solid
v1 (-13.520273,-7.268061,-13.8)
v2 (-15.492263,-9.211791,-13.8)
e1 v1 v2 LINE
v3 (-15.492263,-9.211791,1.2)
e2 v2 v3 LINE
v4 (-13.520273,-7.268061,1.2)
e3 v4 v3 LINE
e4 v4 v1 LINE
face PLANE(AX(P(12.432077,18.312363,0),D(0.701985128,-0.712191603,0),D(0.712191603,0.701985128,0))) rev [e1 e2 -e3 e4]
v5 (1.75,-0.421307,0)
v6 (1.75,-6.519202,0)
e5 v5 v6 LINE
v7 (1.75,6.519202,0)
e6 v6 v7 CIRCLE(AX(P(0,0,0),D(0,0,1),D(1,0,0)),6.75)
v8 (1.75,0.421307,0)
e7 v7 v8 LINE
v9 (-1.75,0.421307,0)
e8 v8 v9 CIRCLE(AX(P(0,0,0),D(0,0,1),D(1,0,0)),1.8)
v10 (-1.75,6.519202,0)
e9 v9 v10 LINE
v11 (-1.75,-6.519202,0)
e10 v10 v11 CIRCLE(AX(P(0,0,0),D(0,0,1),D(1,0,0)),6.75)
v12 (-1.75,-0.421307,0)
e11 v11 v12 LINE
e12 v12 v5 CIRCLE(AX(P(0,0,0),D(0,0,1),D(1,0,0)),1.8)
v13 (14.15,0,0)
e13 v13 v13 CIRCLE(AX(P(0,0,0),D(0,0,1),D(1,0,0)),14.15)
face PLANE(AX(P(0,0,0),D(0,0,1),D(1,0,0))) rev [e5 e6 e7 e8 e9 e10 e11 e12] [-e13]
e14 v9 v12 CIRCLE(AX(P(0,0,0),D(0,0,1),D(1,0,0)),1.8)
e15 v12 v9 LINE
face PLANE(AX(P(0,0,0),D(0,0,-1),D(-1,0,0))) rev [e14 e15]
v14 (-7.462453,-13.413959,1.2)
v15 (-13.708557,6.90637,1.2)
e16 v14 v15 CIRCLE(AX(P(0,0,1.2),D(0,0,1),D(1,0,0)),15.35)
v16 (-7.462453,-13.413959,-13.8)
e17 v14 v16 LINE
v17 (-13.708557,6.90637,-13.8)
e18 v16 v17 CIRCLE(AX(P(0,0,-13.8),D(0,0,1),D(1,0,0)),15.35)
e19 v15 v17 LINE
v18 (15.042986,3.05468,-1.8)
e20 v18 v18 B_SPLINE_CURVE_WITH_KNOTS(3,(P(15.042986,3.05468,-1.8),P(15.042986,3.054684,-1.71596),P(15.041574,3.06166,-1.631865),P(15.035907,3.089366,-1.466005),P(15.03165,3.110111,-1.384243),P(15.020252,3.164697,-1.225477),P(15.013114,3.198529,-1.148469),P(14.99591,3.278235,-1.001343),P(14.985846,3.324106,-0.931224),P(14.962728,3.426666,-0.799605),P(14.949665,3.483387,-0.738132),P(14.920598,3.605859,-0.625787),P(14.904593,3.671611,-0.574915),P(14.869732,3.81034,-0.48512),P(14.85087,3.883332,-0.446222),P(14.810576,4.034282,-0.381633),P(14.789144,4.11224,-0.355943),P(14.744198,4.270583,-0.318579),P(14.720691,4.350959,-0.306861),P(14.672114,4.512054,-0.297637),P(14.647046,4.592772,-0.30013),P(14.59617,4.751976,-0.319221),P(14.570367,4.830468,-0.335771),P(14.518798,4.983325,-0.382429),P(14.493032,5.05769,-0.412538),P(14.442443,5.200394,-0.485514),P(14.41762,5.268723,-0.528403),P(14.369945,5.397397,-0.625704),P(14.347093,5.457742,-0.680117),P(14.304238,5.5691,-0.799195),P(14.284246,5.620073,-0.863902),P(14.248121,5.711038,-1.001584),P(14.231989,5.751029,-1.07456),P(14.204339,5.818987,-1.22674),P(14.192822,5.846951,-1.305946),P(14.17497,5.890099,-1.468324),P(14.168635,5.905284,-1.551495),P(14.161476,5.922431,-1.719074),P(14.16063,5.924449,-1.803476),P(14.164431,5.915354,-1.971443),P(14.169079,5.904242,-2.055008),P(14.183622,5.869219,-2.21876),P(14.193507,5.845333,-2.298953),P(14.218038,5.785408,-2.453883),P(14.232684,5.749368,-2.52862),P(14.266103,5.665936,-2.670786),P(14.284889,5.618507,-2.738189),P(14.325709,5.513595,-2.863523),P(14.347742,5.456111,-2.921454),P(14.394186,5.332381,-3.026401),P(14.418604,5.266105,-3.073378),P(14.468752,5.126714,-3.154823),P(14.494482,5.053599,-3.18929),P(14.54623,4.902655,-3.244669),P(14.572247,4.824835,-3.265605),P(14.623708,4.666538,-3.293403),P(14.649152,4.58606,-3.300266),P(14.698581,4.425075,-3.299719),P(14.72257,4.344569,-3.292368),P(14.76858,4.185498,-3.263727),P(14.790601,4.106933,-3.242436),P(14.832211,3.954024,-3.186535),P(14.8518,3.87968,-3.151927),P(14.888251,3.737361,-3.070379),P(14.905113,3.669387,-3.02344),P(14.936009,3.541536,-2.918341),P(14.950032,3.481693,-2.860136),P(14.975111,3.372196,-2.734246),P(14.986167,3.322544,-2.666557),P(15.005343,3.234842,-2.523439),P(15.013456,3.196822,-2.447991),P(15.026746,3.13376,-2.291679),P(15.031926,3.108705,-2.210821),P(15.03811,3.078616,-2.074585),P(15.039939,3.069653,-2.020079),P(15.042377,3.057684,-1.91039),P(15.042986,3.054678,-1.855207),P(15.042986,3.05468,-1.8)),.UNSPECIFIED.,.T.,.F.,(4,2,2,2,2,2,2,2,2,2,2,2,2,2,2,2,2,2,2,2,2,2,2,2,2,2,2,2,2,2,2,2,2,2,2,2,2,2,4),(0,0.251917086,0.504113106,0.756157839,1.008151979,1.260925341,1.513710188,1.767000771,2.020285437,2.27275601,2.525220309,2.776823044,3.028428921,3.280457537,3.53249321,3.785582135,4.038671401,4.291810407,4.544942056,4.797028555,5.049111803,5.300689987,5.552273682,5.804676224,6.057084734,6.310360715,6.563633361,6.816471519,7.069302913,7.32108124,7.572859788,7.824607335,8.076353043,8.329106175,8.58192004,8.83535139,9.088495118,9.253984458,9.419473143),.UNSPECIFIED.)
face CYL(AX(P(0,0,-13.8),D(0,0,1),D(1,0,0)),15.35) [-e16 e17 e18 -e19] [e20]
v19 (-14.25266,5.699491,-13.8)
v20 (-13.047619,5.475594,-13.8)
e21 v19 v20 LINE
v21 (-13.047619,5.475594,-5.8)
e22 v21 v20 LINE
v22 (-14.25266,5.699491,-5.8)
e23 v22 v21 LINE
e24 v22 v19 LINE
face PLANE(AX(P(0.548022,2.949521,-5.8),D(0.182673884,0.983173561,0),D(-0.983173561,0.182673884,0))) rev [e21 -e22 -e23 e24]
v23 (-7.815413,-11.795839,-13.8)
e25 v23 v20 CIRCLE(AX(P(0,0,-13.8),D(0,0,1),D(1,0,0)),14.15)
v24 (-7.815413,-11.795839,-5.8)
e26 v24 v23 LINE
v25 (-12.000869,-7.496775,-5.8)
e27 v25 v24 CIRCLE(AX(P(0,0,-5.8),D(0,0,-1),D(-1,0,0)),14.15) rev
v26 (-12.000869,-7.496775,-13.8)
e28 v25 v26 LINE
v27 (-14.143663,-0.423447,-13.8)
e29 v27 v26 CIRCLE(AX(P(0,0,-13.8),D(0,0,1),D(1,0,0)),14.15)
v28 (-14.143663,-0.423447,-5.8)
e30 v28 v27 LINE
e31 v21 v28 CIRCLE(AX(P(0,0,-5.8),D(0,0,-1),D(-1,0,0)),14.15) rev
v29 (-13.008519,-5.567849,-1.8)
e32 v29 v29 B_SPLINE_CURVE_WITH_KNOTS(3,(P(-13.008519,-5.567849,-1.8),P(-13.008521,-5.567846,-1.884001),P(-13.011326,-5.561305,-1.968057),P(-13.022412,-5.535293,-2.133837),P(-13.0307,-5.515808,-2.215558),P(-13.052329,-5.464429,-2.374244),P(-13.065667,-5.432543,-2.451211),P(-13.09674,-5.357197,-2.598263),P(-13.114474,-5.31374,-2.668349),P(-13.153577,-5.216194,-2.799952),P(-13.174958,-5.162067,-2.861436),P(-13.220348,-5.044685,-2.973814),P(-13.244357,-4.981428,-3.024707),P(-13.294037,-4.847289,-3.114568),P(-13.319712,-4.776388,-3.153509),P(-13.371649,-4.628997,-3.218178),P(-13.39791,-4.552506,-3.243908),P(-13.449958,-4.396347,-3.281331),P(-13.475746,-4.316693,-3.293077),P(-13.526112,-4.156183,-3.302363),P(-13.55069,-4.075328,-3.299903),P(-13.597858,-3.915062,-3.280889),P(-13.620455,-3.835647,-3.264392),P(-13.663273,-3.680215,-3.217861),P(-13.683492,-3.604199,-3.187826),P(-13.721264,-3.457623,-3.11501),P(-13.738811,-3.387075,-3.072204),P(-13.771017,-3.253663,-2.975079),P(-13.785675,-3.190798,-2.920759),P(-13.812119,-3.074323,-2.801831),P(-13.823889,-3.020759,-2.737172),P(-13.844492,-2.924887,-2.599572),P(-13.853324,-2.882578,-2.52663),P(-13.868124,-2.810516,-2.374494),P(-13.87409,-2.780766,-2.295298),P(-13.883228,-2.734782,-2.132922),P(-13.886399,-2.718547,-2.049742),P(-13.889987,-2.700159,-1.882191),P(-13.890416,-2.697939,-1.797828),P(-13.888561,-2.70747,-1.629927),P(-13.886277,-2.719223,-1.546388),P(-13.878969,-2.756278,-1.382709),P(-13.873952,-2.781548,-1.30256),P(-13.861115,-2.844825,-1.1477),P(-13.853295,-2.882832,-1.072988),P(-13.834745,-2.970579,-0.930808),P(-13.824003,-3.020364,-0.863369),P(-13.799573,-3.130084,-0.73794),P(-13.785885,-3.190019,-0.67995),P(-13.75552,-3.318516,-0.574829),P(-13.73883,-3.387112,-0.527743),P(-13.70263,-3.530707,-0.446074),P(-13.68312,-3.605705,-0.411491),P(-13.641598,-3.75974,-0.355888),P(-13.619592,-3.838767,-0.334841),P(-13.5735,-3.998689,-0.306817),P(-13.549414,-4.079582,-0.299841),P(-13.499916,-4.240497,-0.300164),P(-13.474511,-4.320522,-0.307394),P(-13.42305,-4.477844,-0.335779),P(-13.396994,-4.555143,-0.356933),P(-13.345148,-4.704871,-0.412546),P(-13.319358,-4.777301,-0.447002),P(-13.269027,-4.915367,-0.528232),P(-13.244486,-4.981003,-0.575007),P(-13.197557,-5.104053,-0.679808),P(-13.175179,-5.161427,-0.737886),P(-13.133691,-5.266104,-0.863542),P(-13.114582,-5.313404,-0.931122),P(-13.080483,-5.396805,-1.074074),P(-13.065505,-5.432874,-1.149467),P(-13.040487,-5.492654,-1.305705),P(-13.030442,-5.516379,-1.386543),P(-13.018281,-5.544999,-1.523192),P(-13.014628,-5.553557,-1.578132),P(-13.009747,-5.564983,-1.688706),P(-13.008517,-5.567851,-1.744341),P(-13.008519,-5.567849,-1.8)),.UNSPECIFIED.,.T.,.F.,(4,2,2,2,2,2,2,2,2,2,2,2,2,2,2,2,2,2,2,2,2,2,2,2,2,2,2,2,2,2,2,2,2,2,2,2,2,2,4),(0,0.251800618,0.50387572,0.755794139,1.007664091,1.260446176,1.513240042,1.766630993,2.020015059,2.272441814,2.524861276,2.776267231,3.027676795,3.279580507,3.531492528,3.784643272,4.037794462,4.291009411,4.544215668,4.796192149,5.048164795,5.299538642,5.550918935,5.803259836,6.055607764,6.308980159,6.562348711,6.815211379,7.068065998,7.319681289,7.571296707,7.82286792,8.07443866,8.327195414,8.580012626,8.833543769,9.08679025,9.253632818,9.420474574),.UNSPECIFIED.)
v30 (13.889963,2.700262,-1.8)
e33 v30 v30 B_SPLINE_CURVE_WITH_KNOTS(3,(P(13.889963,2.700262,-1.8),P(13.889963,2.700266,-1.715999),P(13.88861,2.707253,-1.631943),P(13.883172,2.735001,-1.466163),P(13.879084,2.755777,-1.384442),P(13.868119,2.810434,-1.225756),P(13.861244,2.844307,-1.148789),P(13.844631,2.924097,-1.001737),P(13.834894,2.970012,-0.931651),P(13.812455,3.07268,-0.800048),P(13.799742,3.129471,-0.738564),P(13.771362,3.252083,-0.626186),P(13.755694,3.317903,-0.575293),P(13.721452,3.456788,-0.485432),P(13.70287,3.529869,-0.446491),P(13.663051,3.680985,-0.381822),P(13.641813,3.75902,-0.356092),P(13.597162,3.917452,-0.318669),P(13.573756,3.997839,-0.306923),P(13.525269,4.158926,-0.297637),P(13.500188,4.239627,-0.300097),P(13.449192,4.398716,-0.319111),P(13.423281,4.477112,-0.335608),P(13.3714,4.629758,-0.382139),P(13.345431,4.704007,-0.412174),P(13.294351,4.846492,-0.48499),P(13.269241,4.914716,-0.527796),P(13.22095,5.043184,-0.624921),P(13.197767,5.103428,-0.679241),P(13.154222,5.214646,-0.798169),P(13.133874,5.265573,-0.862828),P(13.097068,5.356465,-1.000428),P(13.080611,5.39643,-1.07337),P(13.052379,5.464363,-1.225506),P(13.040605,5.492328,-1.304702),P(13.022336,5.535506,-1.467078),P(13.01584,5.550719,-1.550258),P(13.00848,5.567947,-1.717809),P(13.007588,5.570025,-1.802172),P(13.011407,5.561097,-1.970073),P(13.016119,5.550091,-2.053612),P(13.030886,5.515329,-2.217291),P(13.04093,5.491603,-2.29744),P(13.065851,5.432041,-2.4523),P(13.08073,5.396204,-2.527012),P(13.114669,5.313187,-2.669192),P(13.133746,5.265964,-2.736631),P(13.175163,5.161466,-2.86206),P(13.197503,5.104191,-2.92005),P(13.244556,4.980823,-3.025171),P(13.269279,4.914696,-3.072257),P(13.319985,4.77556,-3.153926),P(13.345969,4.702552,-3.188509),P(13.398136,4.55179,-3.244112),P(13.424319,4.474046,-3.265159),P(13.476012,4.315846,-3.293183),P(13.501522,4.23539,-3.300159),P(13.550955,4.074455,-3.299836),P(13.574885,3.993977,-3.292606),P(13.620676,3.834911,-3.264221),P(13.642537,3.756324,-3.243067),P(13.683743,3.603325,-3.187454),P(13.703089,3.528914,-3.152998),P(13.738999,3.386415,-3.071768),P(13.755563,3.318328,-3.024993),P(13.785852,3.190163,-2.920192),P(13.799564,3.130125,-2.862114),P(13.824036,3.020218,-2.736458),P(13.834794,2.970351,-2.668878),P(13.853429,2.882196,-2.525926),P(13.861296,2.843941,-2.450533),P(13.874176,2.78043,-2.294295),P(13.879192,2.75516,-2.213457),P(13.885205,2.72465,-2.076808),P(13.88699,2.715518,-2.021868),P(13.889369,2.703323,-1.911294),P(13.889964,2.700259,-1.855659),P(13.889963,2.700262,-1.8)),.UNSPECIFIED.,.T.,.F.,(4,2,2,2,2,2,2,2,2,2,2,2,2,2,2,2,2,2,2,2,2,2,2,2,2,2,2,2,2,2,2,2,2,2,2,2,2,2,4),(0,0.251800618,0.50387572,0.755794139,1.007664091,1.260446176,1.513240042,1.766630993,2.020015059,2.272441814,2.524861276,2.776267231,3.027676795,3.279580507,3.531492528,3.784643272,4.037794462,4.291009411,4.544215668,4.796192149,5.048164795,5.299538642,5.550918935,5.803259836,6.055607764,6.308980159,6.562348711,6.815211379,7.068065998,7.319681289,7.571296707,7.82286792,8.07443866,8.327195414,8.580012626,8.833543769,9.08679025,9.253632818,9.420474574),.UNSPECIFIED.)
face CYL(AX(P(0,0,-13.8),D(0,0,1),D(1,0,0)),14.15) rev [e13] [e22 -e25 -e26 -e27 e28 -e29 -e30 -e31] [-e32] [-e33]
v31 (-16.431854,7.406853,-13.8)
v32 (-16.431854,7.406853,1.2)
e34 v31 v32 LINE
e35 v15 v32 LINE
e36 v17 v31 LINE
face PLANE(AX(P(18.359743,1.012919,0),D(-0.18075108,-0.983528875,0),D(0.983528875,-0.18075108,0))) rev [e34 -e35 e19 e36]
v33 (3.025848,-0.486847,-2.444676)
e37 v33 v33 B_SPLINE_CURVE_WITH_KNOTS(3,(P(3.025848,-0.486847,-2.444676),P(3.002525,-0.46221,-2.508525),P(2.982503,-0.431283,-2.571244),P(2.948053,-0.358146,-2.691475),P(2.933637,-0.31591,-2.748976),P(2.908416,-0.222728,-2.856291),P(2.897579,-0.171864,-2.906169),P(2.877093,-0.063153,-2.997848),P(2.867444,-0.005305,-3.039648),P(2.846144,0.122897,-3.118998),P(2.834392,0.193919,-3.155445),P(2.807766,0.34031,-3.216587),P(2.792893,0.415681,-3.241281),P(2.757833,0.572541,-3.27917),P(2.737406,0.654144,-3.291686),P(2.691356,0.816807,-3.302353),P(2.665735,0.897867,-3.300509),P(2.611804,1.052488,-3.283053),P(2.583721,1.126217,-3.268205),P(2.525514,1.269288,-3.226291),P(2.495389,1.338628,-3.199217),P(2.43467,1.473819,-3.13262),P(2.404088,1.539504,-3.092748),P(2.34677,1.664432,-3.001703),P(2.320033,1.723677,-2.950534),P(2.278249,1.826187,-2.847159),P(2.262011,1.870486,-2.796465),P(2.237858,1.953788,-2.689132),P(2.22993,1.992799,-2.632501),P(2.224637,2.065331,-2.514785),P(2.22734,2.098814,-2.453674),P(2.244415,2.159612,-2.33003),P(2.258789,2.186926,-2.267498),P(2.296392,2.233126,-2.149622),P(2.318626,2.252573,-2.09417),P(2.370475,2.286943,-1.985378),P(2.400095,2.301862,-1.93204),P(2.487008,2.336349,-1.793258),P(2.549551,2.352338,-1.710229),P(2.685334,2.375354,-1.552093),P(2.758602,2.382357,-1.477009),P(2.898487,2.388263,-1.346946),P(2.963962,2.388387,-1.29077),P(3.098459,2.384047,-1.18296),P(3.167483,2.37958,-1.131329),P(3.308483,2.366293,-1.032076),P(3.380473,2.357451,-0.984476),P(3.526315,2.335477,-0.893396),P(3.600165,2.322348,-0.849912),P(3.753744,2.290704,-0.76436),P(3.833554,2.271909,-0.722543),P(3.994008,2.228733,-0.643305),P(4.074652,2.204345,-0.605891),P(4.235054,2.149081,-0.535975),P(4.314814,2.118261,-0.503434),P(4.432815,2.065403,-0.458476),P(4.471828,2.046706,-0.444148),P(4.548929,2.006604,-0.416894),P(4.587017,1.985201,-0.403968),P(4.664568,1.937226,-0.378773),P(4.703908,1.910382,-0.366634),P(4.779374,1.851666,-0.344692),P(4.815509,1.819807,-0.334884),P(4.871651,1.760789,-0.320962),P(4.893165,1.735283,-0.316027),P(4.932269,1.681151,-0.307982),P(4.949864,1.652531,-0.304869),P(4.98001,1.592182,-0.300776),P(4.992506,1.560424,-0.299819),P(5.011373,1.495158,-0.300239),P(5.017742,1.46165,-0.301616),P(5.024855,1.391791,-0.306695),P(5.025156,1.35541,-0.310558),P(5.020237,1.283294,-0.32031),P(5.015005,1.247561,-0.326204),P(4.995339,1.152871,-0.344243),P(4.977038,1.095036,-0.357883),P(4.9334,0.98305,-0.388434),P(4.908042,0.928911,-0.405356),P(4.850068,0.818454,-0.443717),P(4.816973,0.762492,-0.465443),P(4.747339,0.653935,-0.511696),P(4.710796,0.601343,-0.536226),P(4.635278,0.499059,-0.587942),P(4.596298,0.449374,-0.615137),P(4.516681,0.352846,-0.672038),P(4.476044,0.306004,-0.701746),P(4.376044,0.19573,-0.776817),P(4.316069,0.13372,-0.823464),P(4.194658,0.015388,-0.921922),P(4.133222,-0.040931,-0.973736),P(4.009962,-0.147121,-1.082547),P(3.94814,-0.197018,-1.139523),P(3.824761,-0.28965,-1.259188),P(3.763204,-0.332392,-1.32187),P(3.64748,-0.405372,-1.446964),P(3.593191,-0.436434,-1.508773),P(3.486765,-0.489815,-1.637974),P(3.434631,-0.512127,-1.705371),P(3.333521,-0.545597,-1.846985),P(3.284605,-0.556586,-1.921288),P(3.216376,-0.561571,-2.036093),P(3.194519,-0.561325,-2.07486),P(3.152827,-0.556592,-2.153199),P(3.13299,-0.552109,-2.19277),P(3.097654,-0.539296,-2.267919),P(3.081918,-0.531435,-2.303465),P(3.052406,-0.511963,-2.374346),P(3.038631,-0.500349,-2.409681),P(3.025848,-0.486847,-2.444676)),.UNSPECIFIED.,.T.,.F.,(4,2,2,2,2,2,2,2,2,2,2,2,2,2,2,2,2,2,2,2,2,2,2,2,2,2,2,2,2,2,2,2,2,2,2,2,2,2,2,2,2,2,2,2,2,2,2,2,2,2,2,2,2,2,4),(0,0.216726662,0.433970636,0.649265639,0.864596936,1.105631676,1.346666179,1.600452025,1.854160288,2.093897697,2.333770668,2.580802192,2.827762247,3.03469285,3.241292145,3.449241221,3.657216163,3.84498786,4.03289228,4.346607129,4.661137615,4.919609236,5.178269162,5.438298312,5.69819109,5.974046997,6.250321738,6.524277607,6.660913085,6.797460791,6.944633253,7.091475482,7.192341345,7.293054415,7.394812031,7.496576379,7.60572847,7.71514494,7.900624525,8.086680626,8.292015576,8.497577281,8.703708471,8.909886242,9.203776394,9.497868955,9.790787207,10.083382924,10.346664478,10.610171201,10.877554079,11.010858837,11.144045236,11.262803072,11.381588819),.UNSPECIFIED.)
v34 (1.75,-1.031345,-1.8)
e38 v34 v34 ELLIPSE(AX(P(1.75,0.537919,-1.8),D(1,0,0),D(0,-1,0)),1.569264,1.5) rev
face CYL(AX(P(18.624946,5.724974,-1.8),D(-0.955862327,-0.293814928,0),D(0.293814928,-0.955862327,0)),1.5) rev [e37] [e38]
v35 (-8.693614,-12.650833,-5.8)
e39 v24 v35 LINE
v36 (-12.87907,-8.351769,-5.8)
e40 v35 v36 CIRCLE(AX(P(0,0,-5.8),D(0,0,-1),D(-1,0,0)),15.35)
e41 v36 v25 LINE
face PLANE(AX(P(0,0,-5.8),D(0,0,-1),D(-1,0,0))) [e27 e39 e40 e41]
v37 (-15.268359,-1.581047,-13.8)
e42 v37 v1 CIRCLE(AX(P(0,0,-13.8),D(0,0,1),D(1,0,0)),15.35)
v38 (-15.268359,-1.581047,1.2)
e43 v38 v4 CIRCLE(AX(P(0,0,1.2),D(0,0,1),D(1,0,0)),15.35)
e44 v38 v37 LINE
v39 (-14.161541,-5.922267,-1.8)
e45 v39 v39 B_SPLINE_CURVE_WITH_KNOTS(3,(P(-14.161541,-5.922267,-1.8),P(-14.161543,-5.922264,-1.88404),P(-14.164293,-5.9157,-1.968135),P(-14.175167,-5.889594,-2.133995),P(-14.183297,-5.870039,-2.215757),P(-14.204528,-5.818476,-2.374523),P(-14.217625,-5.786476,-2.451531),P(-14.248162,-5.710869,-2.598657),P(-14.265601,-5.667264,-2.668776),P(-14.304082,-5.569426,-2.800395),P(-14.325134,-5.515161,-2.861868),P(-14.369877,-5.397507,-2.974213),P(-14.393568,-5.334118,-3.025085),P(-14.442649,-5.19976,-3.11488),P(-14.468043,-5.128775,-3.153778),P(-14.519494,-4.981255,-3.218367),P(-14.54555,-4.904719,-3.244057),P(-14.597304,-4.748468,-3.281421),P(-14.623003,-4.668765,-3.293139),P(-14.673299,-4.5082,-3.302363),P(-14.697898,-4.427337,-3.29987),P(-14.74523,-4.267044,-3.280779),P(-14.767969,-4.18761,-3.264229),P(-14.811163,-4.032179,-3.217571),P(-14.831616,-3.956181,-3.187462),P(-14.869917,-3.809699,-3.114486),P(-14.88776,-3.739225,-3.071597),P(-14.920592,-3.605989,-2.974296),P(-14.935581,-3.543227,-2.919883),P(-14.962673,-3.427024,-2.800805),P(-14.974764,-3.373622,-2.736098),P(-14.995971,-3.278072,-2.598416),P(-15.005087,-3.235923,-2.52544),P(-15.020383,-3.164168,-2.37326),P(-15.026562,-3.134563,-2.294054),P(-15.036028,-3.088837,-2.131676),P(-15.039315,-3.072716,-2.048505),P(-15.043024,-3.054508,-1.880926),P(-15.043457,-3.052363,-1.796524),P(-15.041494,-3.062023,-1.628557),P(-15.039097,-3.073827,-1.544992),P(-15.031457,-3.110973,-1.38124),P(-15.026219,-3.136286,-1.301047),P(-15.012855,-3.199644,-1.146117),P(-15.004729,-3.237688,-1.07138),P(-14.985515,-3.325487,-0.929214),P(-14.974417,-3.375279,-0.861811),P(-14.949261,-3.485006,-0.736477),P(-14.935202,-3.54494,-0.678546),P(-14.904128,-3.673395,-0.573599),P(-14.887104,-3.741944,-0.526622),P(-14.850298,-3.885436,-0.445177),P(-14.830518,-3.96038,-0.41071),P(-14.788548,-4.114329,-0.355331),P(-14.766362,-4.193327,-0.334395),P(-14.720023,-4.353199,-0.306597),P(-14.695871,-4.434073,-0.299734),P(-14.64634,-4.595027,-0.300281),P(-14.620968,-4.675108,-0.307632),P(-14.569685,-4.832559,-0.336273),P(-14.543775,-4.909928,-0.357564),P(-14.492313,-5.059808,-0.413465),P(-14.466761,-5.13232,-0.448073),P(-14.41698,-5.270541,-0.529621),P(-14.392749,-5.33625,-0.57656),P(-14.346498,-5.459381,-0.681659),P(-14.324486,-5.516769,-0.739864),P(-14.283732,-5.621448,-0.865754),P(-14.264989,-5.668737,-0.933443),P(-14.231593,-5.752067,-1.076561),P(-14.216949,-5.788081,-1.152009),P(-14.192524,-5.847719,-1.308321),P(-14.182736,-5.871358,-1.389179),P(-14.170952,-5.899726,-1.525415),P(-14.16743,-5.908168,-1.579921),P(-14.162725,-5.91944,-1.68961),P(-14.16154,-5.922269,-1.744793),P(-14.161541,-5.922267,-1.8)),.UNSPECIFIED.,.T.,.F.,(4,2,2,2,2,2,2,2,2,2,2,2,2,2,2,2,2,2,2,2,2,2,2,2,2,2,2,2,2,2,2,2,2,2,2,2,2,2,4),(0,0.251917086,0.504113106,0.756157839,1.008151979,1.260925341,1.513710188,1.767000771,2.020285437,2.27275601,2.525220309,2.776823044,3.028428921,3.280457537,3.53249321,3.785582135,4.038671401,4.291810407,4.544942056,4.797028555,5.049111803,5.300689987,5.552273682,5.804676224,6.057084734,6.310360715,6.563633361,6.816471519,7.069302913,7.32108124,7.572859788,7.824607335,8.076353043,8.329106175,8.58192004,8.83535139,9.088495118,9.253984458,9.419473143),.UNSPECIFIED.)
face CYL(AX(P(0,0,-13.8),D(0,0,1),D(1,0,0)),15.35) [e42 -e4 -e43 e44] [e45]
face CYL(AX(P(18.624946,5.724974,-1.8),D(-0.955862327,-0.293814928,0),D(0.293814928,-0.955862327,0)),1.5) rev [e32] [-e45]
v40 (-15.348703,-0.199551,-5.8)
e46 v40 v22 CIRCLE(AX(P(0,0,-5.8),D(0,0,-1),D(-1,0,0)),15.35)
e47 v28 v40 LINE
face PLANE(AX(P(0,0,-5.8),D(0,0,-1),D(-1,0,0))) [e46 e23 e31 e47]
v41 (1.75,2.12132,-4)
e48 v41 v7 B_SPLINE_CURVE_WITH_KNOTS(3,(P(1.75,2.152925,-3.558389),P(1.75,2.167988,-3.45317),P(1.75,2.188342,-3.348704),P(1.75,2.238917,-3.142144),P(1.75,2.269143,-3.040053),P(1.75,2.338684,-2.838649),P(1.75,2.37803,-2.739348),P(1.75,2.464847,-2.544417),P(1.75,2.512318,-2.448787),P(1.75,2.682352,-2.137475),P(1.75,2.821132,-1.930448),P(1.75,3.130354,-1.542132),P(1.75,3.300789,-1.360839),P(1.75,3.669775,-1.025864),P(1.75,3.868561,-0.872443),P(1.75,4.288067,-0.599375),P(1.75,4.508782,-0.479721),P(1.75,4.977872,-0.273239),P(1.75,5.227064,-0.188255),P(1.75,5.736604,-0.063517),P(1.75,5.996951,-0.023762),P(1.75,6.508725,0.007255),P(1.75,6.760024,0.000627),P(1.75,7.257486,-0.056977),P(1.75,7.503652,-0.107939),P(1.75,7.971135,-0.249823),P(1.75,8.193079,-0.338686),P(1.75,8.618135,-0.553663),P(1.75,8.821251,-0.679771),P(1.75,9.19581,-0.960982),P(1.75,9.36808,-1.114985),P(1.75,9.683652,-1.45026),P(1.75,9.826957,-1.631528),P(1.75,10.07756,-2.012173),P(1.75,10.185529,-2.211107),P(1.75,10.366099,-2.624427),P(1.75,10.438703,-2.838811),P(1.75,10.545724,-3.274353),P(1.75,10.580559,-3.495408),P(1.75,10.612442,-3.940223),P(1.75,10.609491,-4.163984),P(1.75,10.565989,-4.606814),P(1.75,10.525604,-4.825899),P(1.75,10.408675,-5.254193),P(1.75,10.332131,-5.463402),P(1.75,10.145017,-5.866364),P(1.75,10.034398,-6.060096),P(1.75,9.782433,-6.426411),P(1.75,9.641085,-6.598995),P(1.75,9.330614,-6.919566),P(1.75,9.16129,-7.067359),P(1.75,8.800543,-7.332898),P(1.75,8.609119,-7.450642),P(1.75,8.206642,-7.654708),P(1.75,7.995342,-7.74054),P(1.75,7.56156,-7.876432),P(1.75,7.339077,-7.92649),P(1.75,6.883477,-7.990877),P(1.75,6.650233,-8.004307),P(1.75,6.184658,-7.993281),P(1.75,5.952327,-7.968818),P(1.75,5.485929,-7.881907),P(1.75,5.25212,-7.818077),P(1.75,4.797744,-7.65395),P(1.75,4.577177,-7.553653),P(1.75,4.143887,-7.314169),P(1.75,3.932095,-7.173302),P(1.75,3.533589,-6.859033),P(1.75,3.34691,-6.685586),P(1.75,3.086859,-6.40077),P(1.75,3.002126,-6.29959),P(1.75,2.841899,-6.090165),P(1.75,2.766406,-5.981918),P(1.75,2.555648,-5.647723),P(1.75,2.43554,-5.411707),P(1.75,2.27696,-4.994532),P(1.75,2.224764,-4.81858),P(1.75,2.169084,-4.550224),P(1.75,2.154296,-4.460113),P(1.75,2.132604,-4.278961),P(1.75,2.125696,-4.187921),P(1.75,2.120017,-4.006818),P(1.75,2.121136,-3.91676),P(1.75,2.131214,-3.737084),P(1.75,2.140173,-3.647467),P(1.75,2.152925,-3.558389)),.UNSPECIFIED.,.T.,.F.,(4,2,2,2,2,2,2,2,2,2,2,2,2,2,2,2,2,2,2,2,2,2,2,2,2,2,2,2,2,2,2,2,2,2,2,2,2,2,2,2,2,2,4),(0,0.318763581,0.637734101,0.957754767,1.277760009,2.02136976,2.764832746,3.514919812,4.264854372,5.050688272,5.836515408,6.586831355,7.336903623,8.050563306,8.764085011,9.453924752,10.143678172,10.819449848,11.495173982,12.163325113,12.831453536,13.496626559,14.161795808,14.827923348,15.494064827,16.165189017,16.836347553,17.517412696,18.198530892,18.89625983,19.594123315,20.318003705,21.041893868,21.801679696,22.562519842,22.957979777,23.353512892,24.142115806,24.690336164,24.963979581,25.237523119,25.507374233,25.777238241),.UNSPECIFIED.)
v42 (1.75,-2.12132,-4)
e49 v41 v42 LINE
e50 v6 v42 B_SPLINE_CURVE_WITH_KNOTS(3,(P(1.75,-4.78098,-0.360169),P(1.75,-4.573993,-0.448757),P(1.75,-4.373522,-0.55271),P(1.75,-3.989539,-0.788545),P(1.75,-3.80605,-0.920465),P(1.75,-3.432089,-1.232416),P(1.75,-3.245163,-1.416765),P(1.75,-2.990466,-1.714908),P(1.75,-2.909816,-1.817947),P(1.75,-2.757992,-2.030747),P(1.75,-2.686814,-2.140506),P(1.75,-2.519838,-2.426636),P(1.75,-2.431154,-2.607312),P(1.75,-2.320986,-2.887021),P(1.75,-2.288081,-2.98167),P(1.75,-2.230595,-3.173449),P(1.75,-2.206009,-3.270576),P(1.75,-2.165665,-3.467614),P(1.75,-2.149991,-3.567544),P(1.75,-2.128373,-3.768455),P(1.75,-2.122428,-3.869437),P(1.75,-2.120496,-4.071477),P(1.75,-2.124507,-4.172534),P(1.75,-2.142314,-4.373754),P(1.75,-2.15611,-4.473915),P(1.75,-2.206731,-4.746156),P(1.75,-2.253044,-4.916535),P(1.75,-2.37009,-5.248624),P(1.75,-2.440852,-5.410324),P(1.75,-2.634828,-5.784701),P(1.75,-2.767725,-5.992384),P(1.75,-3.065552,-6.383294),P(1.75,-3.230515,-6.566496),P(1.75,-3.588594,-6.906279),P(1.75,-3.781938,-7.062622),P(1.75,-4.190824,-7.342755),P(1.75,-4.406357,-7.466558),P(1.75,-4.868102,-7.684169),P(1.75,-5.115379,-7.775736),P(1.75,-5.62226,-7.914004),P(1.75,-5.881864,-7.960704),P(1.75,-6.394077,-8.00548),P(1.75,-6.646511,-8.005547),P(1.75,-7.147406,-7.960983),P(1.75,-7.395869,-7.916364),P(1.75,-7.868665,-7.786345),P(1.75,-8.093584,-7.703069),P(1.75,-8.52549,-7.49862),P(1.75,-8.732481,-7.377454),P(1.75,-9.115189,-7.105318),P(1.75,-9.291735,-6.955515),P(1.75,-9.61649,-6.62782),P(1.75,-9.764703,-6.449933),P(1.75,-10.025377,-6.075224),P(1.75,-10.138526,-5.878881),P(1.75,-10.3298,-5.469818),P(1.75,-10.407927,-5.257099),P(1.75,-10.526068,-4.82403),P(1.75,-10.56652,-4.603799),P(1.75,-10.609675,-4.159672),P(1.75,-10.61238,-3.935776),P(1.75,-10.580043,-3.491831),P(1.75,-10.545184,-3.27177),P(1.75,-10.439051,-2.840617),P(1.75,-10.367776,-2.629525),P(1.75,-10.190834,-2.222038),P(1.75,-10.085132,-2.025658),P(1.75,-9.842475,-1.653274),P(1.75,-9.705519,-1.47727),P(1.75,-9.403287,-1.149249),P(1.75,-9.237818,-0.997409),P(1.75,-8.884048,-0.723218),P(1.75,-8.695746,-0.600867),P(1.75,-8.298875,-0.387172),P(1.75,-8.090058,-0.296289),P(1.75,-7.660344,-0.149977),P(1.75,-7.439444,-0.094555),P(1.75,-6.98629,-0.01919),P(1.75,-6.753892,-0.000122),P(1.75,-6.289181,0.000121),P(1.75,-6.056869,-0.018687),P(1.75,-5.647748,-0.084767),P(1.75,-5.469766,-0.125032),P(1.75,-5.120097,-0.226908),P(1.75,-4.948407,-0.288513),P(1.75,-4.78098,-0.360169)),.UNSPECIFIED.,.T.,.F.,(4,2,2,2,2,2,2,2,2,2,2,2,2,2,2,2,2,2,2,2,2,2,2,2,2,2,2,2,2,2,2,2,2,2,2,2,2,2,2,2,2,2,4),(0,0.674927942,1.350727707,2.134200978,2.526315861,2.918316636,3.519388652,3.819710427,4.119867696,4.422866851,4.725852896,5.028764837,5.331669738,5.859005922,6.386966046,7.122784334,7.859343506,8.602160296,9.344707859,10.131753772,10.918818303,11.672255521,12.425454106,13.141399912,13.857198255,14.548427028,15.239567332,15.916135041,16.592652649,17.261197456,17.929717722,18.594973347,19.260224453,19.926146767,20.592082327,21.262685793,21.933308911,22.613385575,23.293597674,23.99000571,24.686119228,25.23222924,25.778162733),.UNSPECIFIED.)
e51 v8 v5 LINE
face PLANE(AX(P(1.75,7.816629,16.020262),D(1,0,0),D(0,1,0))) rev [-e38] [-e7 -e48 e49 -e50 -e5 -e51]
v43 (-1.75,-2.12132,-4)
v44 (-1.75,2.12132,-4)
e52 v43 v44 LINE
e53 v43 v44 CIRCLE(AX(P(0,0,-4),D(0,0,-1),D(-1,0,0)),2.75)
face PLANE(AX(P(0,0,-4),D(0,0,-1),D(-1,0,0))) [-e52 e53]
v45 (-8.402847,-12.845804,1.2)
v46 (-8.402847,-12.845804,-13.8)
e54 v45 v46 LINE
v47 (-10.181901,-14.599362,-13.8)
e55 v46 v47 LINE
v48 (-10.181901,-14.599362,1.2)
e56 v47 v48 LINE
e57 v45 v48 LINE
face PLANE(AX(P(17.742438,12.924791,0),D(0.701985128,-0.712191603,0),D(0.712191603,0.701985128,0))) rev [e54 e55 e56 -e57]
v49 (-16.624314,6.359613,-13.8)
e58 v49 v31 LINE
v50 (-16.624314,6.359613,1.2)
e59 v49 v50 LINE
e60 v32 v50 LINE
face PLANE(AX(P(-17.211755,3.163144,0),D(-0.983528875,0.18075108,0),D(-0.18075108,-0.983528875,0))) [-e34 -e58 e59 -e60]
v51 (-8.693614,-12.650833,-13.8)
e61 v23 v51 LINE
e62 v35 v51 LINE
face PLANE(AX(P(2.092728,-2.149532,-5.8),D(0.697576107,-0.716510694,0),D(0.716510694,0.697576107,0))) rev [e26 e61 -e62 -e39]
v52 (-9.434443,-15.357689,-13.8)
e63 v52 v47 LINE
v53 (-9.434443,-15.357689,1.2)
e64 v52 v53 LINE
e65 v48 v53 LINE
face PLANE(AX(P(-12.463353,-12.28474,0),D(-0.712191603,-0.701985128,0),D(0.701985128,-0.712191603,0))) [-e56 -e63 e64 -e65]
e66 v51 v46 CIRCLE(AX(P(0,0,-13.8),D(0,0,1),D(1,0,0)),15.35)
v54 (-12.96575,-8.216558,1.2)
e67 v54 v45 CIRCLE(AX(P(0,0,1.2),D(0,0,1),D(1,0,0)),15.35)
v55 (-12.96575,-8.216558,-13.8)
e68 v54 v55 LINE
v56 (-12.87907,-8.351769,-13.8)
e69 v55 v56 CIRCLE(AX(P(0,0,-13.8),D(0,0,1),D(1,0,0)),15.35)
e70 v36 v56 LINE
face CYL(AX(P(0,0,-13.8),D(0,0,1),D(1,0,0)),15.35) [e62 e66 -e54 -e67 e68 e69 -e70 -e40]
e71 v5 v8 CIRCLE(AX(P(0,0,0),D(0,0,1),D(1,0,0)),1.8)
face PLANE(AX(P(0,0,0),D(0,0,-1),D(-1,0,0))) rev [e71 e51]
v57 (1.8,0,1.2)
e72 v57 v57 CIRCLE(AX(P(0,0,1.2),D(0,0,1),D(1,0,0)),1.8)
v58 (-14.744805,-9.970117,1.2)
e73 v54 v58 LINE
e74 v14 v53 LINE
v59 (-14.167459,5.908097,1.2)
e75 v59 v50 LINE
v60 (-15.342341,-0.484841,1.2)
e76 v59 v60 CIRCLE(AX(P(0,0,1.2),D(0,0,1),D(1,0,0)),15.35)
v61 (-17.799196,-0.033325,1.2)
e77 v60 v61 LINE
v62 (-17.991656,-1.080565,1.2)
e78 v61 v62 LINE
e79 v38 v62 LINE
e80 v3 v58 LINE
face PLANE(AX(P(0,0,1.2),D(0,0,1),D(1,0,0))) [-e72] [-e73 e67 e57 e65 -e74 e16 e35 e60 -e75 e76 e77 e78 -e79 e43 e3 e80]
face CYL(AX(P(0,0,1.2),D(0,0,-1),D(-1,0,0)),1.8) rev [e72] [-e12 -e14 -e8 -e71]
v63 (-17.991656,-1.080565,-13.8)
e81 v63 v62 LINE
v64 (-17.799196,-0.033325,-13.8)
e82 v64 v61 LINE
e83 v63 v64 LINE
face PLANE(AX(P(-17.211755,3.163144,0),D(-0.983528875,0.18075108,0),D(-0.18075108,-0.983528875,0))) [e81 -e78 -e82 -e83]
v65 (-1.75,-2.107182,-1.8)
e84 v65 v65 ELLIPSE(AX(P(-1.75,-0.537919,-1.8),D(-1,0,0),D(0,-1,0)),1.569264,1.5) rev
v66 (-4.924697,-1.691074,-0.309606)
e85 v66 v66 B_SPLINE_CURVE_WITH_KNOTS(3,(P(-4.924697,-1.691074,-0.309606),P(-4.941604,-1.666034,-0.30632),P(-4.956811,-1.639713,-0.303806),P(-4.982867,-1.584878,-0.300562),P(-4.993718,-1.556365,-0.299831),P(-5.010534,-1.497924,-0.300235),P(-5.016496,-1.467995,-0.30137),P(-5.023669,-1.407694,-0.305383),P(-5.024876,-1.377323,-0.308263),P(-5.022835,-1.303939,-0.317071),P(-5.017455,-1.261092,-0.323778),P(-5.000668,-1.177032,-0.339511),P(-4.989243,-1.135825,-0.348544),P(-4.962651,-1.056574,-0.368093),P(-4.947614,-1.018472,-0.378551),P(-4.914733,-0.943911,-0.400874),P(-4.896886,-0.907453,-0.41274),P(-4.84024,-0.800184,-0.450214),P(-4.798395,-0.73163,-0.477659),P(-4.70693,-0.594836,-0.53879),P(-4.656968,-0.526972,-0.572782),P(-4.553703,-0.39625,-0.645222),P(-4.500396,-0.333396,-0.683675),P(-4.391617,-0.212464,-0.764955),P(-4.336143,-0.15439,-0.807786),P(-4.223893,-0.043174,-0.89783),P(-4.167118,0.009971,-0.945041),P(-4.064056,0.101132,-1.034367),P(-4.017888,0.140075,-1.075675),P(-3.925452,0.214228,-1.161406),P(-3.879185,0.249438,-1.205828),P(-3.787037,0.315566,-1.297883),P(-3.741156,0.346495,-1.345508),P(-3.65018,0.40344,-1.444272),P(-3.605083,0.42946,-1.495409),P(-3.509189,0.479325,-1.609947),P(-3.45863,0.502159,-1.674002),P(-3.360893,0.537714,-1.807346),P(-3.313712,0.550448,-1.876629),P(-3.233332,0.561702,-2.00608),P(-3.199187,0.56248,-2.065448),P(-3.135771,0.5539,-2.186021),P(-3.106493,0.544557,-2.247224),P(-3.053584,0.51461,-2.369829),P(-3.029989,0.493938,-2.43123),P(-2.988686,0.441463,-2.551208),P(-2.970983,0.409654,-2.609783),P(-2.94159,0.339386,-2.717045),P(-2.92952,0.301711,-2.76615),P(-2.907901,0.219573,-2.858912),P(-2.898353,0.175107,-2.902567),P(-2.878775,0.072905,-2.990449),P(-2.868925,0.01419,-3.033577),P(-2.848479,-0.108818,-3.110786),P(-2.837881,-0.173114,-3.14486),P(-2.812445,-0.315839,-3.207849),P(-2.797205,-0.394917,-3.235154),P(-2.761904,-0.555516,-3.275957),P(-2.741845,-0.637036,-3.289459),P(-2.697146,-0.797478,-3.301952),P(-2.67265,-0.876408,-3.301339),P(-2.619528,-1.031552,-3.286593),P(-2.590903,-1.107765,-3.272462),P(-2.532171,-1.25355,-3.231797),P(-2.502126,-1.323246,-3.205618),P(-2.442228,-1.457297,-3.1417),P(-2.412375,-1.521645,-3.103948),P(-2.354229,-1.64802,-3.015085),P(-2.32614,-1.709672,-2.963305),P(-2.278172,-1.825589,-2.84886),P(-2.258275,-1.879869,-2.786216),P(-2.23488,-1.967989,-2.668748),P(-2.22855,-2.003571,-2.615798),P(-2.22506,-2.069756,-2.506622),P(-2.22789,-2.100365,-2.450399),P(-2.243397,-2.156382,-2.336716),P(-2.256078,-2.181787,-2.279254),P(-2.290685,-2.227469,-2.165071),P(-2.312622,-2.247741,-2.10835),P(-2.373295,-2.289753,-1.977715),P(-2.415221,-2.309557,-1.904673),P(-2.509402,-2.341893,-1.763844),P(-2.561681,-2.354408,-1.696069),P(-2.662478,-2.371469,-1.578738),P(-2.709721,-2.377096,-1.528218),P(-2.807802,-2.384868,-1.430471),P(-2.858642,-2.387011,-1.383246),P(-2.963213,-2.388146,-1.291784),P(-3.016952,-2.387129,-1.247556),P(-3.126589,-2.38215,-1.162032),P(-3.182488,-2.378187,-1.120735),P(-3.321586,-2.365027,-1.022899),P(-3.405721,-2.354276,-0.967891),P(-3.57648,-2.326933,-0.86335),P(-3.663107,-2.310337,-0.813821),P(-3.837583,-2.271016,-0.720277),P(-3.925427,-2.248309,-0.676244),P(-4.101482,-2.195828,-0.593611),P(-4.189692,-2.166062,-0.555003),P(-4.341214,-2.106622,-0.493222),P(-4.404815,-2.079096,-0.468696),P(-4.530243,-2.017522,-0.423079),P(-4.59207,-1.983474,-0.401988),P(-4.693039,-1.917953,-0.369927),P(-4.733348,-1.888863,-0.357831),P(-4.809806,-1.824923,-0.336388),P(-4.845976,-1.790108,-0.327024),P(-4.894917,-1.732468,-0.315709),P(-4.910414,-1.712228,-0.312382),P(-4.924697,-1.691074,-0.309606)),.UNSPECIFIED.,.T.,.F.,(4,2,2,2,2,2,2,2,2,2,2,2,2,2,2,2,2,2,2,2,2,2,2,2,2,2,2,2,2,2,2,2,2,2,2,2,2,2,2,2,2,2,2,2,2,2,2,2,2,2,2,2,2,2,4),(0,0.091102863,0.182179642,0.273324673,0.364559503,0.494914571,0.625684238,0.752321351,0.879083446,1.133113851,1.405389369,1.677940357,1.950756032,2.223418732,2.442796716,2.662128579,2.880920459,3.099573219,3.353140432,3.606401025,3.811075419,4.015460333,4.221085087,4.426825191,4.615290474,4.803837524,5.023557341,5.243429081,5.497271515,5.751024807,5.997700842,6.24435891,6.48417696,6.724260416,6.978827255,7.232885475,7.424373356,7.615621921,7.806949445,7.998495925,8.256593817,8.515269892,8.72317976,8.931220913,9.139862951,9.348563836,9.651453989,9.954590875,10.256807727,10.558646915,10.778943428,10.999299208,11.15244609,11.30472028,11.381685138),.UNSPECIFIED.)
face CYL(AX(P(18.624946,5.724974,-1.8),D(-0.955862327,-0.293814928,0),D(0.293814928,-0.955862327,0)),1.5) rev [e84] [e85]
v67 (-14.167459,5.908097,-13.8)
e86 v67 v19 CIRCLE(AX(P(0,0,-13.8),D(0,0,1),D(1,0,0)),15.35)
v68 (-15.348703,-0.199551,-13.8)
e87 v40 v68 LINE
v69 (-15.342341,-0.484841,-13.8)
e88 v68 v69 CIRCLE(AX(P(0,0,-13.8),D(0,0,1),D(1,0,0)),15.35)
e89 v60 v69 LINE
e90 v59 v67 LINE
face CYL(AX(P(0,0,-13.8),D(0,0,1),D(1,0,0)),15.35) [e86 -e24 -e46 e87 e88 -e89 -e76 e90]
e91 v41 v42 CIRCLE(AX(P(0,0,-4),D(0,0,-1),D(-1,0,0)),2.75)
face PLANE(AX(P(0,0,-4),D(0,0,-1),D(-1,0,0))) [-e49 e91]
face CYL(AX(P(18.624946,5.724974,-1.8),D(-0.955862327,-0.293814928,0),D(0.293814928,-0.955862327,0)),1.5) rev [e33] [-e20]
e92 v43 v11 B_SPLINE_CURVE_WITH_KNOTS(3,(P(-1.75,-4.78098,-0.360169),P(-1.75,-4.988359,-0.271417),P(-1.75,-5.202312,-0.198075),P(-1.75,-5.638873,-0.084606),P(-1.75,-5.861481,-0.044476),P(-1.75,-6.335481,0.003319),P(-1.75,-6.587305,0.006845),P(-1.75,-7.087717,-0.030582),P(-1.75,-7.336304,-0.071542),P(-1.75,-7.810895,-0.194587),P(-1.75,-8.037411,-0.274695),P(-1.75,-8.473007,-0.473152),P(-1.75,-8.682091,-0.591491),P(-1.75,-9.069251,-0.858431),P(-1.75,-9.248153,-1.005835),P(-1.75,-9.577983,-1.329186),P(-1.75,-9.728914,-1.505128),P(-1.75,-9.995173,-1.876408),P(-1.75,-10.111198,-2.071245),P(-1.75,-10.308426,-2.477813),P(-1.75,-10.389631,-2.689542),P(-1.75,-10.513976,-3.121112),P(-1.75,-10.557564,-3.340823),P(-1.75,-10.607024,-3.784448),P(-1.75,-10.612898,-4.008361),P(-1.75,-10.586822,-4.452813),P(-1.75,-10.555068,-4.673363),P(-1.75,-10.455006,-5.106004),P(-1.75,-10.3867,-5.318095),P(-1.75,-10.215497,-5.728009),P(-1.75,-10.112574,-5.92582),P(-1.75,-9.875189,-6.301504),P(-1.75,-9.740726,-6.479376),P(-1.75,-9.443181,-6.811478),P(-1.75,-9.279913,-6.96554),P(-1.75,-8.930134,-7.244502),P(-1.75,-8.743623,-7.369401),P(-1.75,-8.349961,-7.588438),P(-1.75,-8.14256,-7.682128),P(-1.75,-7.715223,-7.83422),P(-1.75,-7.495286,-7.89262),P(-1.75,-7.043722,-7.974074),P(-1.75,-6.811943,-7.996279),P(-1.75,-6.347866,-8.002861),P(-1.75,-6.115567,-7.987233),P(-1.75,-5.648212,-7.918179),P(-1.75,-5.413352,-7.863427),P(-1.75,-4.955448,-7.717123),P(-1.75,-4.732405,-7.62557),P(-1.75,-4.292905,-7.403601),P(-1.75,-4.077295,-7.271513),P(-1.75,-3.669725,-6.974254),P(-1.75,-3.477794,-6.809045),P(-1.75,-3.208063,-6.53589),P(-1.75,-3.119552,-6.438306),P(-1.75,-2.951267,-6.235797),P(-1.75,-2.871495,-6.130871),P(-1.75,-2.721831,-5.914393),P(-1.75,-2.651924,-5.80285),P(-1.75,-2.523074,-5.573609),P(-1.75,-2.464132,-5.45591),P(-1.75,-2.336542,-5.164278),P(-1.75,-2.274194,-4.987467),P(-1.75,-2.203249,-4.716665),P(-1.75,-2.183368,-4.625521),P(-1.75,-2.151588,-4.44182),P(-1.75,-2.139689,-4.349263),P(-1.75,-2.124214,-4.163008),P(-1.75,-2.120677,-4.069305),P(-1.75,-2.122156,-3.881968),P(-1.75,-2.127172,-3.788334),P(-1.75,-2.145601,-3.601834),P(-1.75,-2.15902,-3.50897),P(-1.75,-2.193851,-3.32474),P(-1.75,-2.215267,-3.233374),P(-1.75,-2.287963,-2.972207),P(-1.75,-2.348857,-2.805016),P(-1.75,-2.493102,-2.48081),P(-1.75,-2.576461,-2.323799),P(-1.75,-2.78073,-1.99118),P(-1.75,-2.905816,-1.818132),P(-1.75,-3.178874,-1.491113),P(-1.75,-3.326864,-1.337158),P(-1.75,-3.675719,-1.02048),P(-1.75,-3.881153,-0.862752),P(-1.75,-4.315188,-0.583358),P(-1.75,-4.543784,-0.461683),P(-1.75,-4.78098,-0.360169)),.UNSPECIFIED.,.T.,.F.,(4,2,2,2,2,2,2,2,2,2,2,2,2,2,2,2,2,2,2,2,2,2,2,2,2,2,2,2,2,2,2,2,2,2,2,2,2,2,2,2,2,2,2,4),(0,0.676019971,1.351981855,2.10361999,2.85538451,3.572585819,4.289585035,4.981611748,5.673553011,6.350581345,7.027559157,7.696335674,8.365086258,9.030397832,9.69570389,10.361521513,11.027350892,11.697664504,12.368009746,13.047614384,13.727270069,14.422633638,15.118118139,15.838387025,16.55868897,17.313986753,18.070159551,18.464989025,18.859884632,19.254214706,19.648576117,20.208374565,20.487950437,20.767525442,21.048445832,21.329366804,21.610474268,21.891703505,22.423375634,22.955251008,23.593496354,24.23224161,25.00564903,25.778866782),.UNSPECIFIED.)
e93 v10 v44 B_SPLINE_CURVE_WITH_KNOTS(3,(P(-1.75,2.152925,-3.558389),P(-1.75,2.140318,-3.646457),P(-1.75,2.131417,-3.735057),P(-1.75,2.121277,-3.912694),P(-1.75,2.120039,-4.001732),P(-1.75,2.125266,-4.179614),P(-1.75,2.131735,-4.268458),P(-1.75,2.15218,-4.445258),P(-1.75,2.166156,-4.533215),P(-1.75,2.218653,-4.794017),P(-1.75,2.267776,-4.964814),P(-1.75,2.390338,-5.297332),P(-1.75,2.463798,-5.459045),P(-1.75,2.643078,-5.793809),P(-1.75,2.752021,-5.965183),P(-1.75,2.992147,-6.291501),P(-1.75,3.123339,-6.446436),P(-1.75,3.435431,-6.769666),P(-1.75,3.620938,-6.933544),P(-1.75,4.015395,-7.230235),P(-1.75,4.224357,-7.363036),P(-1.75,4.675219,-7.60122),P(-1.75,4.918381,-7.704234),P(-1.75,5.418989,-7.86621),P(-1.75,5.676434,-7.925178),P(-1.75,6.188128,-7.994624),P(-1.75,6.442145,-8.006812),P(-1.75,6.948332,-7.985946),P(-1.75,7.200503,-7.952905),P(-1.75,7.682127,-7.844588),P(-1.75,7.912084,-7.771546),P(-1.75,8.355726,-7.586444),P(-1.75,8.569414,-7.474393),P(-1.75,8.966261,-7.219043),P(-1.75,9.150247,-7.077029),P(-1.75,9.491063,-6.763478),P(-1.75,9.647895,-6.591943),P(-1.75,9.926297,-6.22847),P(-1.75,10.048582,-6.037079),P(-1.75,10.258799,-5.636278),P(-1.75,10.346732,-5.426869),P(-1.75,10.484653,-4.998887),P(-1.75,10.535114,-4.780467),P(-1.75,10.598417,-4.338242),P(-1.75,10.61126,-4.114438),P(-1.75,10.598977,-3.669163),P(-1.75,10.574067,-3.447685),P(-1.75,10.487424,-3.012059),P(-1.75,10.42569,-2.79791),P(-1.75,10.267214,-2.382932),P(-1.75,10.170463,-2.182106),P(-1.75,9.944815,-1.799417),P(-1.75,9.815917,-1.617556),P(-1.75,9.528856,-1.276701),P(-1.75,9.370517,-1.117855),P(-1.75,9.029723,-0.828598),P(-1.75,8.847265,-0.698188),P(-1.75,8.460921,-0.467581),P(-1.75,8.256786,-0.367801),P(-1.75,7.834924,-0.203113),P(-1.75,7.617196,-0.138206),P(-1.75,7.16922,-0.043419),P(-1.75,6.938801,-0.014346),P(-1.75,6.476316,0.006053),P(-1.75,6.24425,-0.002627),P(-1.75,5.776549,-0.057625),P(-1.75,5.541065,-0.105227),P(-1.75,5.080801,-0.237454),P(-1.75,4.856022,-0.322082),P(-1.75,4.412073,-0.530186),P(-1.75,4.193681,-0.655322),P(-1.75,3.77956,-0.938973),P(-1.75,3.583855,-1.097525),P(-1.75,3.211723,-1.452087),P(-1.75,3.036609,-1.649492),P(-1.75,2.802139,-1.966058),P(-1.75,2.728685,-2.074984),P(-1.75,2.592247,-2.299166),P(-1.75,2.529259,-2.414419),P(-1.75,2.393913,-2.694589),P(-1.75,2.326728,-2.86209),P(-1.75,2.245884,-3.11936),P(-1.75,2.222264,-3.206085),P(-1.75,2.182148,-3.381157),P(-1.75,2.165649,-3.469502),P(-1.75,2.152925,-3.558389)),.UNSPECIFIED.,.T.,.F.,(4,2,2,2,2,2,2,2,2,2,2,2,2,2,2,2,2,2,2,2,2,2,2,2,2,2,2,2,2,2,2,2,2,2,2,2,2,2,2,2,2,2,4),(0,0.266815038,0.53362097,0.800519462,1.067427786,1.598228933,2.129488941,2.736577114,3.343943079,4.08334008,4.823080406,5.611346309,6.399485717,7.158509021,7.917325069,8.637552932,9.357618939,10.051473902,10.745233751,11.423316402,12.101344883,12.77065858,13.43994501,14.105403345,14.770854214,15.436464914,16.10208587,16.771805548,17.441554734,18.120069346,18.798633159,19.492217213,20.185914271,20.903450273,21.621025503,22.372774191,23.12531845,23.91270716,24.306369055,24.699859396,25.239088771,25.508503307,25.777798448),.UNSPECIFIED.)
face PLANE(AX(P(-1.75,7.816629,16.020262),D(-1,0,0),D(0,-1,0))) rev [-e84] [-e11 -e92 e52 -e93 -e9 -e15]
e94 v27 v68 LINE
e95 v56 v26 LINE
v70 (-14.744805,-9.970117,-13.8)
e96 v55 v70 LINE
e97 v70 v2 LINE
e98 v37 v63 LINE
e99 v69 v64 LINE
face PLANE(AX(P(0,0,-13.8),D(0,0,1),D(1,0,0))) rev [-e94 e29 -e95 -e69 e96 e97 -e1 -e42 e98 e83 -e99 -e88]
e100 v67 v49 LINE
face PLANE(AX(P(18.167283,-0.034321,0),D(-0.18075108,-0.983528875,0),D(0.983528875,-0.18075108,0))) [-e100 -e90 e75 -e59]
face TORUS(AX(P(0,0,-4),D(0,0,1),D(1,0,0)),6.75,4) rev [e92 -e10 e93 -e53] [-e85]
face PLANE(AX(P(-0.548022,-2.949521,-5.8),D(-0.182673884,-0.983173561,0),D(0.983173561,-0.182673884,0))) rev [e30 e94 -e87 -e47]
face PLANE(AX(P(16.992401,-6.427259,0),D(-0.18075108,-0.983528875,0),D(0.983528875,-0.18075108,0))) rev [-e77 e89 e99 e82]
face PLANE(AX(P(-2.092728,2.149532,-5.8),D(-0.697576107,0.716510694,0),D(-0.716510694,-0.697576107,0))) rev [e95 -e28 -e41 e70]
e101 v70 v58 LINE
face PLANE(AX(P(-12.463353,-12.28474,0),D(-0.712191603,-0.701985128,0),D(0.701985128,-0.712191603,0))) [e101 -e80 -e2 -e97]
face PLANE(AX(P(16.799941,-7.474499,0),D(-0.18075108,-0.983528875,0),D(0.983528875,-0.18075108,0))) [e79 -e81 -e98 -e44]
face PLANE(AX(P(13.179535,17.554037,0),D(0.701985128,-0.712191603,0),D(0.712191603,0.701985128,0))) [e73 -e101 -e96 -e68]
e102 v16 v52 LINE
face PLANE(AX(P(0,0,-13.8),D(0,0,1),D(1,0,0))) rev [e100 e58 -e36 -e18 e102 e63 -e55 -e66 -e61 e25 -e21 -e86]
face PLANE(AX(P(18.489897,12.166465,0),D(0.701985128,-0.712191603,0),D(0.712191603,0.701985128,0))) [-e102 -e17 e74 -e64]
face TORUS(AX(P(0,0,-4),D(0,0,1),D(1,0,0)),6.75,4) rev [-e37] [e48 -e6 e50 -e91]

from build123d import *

# Parameters (mm, degrees)
SKETCH1_R                = 14.15
SKETCH1_R_2              = 1.8
BOSS_EXTRUDE1_DEPTH      = 1.2
BOSS_EXTRUDE2_START      = -15
SKETCH3_R                = 15.35
SKETCH3_R_2              = 14.15
BOSS_EXTRUDE2_DEPTH      = 15
CUT_EXTRUDE2_DEPTH       = 8
BOSS_EXTRUDE3_REACH      = 43.566
BOSS_EXTRUDE3_END_RADIUS = 15.35
SKETCH6_W                = 15
SKETCH6_H                = 1.064778235
CIRPATTERN1_COUNT        = 2
CIRPATTERN1_ANGLE        = 305
SKETCH7_R                = 2.75
SKETCH7_R_2              = 1.75
BOSS_EXTRUDE4_DEPTH      = 4
FILLET1_R                = 4
SKETCH8_W                = 3.5
SKETCH8_H                = 15.633258876
CUT_EXTRUDE3_DEPTH       = 4
SKETCH4_R                = 1.5
CUT_EXTRUDE1_DEPTH       = 37


with BuildPart() as part:
    # Sketch1 → Boss-Extrude1 (new body)
    with BuildSketch(Plane.XY):
        Circle(SKETCH1_R)
        Circle(SKETCH1_R_2, mode=Mode.SUBTRACT)
    extrude(amount=BOSS_EXTRUDE1_DEPTH)

    # Sketch3 → Boss-Extrude2 (add)
    with BuildSketch(Plane.XY.offset(1.2).offset(BOSS_EXTRUDE2_START)):
        Circle(SKETCH3_R)
        Circle(SKETCH3_R_2, mode=Mode.SUBTRACT)
    extrude(amount=BOSS_EXTRUDE2_DEPTH)

    # Sketch5 → Cut-Extrude2 (cut)
    with BuildSketch(Plane(origin=(0, 0, -13.8), x_dir=(-1, 0, 0), z_dir=(0, 0, -1))):
        with BuildLine():
            Line((14.252659556, 5.699490817), (13.047619315, 5.47559405))
            ThreePointArc((13.047619315, 5.47559405), (13.871667407, 2.792730446), (14.15, 0))
            ThreePointArc((14.15, 0), (14.148415567, -0.21174737), (14.143662622, -0.423447319))
            Line((14.143662622, -0.423447319), (15.348702863, -0.199550552))
            ThreePointArc((15.348702863, -0.199550552), (15.349675712, -0.099777384), (15.35, 0))
            ThreePointArc((15.35, 0), (15.073168615, 2.902083373), (14.252659556, 5.699490817))
        make_face()
        with BuildLine():
            ThreePointArc((12.000869192, -7.496775216), (10.138626321, -9.870701916), (7.815412549, -11.79583938))
            Line((7.815412549, -11.79583938), (8.693613767, -12.650833161))
            ThreePointArc((8.693613767, -12.650833161), (10.998439154, -10.707793245), (12.87907041, -8.351768997))
            Line((12.87907041, -8.351768997), (12.000869192, -7.496775216))
        make_face()
    extrude(amount=-CUT_EXTRUDE2_DEPTH, mode=Mode.SUBTRACT)

    # Boss-Extrude3: up to this cylinder (the profile starts outside it)
    boss_extrude3_end = Plane(origin=(0, 0, -6.3), z_dir=(0, 0, 1)) * Cylinder(BOSS_EXTRUDE3_END_RADIUS, 118.832, mode=Mode.PRIVATE)
    # Sketch6 → Boss-Extrude3 (add, up to the surface)
    with BuildSketch(Plane(origin=(-12.463353061, -12.28473974, 0), x_dir=(0, 0, 1), z_dir=(-0.7121916034988102, -0.7019851279804962, 0)), mode=Mode.PRIVATE) as boss_extrude3_sk1:
        with Locations((-6.3, -3.782389118)):
            Rectangle(SKETCH6_W, SKETCH6_H)
    boss_extrude3_tool1 = extrude(boss_extrude3_sk1.sketch, amount=-BOSS_EXTRUDE3_REACH, mode=Mode.PRIVATE) - boss_extrude3_end
    # Sketch6 → Boss-Extrude3 (add, up to the surface)
    with BuildSketch(Plane(origin=(-12.463353061, -12.28473974, 0), x_dir=(0, 0, 1), z_dir=(-0.7121916034988102, -0.7019851279804962, 0)), mode=Mode.PRIVATE) as boss_extrude3_sk2:
        with Locations((-6.3, 3.782389118)):
            Rectangle(SKETCH6_W, SKETCH6_H)
    boss_extrude3_tool2 = extrude(boss_extrude3_sk2.sketch, amount=-BOSS_EXTRUDE3_REACH, mode=Mode.PRIVATE) - boss_extrude3_end
    boss_extrude3 = boss_extrude3_tool1.solids().sort_by_distance((-9.808172, -14.978526, -6.3))[0] + boss_extrude3_tool2.solids().sort_by_distance((-15.118534, -9.590954, -6.3))[0]
    add(boss_extrude3)

    # CirPattern1: Boss-Extrude3 ×2 about axis
    cirpattern1_axis = Axis((0, 0, 0), (0, 0, 1))
    for i in range(1, CIRPATTERN1_COUNT):
        add(boss_extrude3.rotate(cirpattern1_axis, i * CIRPATTERN1_ANGLE / (CIRPATTERN1_COUNT - 1)))

    # Sketch7 → Boss-Extrude4 (add)
    with BuildSketch(Plane(origin=(0, 0, 0), x_dir=(-1, 0, 0), z_dir=(0, 0, -1))):
        with Locations(Location((0, 0, 0), (0, 0, 180))):
            Circle(SKETCH7_R)
        Circle(SKETCH7_R_2, mode=Mode.SUBTRACT)
    extrude(amount=BOSS_EXTRUDE4_DEPTH)

    # Fillet1
    fillet1_edges = [part.edges().sort_by_distance(p)[0] for p in [
        (-2.75, 0, 0),
    ]]
    fillet(fillet1_edges, radius=FILLET1_R - 0.0001)  # a hair under: the kernel refuses the full size

    # Sketch8 → Cut-Extrude3 (cut)
    with BuildSketch(Plane(origin=(0, 0, -4), x_dir=(-1, 0, 0), z_dir=(0, 0, -1))):
        Rectangle(SKETCH8_W, SKETCH8_H)
    extrude(amount=-CUT_EXTRUDE3_DEPTH, mode=Mode.SUBTRACT)

    # Sketch4 → Cut-Extrude1 (cut)
    with BuildSketch(Plane(origin=(-17.515032447, -2.63115554, 0), x_dir=(0.293814927975495, -0.9558623269586236, 0), z_dir=(0.9558623269586236, 0.293814927975495, 0))):
        with Locations((2.63115554, 1.8)):
            Circle(SKETCH4_R)
    extrude(amount=CUT_EXTRUDE1_DEPTH, mode=Mode.SUBTRACT)


solid = part.part
